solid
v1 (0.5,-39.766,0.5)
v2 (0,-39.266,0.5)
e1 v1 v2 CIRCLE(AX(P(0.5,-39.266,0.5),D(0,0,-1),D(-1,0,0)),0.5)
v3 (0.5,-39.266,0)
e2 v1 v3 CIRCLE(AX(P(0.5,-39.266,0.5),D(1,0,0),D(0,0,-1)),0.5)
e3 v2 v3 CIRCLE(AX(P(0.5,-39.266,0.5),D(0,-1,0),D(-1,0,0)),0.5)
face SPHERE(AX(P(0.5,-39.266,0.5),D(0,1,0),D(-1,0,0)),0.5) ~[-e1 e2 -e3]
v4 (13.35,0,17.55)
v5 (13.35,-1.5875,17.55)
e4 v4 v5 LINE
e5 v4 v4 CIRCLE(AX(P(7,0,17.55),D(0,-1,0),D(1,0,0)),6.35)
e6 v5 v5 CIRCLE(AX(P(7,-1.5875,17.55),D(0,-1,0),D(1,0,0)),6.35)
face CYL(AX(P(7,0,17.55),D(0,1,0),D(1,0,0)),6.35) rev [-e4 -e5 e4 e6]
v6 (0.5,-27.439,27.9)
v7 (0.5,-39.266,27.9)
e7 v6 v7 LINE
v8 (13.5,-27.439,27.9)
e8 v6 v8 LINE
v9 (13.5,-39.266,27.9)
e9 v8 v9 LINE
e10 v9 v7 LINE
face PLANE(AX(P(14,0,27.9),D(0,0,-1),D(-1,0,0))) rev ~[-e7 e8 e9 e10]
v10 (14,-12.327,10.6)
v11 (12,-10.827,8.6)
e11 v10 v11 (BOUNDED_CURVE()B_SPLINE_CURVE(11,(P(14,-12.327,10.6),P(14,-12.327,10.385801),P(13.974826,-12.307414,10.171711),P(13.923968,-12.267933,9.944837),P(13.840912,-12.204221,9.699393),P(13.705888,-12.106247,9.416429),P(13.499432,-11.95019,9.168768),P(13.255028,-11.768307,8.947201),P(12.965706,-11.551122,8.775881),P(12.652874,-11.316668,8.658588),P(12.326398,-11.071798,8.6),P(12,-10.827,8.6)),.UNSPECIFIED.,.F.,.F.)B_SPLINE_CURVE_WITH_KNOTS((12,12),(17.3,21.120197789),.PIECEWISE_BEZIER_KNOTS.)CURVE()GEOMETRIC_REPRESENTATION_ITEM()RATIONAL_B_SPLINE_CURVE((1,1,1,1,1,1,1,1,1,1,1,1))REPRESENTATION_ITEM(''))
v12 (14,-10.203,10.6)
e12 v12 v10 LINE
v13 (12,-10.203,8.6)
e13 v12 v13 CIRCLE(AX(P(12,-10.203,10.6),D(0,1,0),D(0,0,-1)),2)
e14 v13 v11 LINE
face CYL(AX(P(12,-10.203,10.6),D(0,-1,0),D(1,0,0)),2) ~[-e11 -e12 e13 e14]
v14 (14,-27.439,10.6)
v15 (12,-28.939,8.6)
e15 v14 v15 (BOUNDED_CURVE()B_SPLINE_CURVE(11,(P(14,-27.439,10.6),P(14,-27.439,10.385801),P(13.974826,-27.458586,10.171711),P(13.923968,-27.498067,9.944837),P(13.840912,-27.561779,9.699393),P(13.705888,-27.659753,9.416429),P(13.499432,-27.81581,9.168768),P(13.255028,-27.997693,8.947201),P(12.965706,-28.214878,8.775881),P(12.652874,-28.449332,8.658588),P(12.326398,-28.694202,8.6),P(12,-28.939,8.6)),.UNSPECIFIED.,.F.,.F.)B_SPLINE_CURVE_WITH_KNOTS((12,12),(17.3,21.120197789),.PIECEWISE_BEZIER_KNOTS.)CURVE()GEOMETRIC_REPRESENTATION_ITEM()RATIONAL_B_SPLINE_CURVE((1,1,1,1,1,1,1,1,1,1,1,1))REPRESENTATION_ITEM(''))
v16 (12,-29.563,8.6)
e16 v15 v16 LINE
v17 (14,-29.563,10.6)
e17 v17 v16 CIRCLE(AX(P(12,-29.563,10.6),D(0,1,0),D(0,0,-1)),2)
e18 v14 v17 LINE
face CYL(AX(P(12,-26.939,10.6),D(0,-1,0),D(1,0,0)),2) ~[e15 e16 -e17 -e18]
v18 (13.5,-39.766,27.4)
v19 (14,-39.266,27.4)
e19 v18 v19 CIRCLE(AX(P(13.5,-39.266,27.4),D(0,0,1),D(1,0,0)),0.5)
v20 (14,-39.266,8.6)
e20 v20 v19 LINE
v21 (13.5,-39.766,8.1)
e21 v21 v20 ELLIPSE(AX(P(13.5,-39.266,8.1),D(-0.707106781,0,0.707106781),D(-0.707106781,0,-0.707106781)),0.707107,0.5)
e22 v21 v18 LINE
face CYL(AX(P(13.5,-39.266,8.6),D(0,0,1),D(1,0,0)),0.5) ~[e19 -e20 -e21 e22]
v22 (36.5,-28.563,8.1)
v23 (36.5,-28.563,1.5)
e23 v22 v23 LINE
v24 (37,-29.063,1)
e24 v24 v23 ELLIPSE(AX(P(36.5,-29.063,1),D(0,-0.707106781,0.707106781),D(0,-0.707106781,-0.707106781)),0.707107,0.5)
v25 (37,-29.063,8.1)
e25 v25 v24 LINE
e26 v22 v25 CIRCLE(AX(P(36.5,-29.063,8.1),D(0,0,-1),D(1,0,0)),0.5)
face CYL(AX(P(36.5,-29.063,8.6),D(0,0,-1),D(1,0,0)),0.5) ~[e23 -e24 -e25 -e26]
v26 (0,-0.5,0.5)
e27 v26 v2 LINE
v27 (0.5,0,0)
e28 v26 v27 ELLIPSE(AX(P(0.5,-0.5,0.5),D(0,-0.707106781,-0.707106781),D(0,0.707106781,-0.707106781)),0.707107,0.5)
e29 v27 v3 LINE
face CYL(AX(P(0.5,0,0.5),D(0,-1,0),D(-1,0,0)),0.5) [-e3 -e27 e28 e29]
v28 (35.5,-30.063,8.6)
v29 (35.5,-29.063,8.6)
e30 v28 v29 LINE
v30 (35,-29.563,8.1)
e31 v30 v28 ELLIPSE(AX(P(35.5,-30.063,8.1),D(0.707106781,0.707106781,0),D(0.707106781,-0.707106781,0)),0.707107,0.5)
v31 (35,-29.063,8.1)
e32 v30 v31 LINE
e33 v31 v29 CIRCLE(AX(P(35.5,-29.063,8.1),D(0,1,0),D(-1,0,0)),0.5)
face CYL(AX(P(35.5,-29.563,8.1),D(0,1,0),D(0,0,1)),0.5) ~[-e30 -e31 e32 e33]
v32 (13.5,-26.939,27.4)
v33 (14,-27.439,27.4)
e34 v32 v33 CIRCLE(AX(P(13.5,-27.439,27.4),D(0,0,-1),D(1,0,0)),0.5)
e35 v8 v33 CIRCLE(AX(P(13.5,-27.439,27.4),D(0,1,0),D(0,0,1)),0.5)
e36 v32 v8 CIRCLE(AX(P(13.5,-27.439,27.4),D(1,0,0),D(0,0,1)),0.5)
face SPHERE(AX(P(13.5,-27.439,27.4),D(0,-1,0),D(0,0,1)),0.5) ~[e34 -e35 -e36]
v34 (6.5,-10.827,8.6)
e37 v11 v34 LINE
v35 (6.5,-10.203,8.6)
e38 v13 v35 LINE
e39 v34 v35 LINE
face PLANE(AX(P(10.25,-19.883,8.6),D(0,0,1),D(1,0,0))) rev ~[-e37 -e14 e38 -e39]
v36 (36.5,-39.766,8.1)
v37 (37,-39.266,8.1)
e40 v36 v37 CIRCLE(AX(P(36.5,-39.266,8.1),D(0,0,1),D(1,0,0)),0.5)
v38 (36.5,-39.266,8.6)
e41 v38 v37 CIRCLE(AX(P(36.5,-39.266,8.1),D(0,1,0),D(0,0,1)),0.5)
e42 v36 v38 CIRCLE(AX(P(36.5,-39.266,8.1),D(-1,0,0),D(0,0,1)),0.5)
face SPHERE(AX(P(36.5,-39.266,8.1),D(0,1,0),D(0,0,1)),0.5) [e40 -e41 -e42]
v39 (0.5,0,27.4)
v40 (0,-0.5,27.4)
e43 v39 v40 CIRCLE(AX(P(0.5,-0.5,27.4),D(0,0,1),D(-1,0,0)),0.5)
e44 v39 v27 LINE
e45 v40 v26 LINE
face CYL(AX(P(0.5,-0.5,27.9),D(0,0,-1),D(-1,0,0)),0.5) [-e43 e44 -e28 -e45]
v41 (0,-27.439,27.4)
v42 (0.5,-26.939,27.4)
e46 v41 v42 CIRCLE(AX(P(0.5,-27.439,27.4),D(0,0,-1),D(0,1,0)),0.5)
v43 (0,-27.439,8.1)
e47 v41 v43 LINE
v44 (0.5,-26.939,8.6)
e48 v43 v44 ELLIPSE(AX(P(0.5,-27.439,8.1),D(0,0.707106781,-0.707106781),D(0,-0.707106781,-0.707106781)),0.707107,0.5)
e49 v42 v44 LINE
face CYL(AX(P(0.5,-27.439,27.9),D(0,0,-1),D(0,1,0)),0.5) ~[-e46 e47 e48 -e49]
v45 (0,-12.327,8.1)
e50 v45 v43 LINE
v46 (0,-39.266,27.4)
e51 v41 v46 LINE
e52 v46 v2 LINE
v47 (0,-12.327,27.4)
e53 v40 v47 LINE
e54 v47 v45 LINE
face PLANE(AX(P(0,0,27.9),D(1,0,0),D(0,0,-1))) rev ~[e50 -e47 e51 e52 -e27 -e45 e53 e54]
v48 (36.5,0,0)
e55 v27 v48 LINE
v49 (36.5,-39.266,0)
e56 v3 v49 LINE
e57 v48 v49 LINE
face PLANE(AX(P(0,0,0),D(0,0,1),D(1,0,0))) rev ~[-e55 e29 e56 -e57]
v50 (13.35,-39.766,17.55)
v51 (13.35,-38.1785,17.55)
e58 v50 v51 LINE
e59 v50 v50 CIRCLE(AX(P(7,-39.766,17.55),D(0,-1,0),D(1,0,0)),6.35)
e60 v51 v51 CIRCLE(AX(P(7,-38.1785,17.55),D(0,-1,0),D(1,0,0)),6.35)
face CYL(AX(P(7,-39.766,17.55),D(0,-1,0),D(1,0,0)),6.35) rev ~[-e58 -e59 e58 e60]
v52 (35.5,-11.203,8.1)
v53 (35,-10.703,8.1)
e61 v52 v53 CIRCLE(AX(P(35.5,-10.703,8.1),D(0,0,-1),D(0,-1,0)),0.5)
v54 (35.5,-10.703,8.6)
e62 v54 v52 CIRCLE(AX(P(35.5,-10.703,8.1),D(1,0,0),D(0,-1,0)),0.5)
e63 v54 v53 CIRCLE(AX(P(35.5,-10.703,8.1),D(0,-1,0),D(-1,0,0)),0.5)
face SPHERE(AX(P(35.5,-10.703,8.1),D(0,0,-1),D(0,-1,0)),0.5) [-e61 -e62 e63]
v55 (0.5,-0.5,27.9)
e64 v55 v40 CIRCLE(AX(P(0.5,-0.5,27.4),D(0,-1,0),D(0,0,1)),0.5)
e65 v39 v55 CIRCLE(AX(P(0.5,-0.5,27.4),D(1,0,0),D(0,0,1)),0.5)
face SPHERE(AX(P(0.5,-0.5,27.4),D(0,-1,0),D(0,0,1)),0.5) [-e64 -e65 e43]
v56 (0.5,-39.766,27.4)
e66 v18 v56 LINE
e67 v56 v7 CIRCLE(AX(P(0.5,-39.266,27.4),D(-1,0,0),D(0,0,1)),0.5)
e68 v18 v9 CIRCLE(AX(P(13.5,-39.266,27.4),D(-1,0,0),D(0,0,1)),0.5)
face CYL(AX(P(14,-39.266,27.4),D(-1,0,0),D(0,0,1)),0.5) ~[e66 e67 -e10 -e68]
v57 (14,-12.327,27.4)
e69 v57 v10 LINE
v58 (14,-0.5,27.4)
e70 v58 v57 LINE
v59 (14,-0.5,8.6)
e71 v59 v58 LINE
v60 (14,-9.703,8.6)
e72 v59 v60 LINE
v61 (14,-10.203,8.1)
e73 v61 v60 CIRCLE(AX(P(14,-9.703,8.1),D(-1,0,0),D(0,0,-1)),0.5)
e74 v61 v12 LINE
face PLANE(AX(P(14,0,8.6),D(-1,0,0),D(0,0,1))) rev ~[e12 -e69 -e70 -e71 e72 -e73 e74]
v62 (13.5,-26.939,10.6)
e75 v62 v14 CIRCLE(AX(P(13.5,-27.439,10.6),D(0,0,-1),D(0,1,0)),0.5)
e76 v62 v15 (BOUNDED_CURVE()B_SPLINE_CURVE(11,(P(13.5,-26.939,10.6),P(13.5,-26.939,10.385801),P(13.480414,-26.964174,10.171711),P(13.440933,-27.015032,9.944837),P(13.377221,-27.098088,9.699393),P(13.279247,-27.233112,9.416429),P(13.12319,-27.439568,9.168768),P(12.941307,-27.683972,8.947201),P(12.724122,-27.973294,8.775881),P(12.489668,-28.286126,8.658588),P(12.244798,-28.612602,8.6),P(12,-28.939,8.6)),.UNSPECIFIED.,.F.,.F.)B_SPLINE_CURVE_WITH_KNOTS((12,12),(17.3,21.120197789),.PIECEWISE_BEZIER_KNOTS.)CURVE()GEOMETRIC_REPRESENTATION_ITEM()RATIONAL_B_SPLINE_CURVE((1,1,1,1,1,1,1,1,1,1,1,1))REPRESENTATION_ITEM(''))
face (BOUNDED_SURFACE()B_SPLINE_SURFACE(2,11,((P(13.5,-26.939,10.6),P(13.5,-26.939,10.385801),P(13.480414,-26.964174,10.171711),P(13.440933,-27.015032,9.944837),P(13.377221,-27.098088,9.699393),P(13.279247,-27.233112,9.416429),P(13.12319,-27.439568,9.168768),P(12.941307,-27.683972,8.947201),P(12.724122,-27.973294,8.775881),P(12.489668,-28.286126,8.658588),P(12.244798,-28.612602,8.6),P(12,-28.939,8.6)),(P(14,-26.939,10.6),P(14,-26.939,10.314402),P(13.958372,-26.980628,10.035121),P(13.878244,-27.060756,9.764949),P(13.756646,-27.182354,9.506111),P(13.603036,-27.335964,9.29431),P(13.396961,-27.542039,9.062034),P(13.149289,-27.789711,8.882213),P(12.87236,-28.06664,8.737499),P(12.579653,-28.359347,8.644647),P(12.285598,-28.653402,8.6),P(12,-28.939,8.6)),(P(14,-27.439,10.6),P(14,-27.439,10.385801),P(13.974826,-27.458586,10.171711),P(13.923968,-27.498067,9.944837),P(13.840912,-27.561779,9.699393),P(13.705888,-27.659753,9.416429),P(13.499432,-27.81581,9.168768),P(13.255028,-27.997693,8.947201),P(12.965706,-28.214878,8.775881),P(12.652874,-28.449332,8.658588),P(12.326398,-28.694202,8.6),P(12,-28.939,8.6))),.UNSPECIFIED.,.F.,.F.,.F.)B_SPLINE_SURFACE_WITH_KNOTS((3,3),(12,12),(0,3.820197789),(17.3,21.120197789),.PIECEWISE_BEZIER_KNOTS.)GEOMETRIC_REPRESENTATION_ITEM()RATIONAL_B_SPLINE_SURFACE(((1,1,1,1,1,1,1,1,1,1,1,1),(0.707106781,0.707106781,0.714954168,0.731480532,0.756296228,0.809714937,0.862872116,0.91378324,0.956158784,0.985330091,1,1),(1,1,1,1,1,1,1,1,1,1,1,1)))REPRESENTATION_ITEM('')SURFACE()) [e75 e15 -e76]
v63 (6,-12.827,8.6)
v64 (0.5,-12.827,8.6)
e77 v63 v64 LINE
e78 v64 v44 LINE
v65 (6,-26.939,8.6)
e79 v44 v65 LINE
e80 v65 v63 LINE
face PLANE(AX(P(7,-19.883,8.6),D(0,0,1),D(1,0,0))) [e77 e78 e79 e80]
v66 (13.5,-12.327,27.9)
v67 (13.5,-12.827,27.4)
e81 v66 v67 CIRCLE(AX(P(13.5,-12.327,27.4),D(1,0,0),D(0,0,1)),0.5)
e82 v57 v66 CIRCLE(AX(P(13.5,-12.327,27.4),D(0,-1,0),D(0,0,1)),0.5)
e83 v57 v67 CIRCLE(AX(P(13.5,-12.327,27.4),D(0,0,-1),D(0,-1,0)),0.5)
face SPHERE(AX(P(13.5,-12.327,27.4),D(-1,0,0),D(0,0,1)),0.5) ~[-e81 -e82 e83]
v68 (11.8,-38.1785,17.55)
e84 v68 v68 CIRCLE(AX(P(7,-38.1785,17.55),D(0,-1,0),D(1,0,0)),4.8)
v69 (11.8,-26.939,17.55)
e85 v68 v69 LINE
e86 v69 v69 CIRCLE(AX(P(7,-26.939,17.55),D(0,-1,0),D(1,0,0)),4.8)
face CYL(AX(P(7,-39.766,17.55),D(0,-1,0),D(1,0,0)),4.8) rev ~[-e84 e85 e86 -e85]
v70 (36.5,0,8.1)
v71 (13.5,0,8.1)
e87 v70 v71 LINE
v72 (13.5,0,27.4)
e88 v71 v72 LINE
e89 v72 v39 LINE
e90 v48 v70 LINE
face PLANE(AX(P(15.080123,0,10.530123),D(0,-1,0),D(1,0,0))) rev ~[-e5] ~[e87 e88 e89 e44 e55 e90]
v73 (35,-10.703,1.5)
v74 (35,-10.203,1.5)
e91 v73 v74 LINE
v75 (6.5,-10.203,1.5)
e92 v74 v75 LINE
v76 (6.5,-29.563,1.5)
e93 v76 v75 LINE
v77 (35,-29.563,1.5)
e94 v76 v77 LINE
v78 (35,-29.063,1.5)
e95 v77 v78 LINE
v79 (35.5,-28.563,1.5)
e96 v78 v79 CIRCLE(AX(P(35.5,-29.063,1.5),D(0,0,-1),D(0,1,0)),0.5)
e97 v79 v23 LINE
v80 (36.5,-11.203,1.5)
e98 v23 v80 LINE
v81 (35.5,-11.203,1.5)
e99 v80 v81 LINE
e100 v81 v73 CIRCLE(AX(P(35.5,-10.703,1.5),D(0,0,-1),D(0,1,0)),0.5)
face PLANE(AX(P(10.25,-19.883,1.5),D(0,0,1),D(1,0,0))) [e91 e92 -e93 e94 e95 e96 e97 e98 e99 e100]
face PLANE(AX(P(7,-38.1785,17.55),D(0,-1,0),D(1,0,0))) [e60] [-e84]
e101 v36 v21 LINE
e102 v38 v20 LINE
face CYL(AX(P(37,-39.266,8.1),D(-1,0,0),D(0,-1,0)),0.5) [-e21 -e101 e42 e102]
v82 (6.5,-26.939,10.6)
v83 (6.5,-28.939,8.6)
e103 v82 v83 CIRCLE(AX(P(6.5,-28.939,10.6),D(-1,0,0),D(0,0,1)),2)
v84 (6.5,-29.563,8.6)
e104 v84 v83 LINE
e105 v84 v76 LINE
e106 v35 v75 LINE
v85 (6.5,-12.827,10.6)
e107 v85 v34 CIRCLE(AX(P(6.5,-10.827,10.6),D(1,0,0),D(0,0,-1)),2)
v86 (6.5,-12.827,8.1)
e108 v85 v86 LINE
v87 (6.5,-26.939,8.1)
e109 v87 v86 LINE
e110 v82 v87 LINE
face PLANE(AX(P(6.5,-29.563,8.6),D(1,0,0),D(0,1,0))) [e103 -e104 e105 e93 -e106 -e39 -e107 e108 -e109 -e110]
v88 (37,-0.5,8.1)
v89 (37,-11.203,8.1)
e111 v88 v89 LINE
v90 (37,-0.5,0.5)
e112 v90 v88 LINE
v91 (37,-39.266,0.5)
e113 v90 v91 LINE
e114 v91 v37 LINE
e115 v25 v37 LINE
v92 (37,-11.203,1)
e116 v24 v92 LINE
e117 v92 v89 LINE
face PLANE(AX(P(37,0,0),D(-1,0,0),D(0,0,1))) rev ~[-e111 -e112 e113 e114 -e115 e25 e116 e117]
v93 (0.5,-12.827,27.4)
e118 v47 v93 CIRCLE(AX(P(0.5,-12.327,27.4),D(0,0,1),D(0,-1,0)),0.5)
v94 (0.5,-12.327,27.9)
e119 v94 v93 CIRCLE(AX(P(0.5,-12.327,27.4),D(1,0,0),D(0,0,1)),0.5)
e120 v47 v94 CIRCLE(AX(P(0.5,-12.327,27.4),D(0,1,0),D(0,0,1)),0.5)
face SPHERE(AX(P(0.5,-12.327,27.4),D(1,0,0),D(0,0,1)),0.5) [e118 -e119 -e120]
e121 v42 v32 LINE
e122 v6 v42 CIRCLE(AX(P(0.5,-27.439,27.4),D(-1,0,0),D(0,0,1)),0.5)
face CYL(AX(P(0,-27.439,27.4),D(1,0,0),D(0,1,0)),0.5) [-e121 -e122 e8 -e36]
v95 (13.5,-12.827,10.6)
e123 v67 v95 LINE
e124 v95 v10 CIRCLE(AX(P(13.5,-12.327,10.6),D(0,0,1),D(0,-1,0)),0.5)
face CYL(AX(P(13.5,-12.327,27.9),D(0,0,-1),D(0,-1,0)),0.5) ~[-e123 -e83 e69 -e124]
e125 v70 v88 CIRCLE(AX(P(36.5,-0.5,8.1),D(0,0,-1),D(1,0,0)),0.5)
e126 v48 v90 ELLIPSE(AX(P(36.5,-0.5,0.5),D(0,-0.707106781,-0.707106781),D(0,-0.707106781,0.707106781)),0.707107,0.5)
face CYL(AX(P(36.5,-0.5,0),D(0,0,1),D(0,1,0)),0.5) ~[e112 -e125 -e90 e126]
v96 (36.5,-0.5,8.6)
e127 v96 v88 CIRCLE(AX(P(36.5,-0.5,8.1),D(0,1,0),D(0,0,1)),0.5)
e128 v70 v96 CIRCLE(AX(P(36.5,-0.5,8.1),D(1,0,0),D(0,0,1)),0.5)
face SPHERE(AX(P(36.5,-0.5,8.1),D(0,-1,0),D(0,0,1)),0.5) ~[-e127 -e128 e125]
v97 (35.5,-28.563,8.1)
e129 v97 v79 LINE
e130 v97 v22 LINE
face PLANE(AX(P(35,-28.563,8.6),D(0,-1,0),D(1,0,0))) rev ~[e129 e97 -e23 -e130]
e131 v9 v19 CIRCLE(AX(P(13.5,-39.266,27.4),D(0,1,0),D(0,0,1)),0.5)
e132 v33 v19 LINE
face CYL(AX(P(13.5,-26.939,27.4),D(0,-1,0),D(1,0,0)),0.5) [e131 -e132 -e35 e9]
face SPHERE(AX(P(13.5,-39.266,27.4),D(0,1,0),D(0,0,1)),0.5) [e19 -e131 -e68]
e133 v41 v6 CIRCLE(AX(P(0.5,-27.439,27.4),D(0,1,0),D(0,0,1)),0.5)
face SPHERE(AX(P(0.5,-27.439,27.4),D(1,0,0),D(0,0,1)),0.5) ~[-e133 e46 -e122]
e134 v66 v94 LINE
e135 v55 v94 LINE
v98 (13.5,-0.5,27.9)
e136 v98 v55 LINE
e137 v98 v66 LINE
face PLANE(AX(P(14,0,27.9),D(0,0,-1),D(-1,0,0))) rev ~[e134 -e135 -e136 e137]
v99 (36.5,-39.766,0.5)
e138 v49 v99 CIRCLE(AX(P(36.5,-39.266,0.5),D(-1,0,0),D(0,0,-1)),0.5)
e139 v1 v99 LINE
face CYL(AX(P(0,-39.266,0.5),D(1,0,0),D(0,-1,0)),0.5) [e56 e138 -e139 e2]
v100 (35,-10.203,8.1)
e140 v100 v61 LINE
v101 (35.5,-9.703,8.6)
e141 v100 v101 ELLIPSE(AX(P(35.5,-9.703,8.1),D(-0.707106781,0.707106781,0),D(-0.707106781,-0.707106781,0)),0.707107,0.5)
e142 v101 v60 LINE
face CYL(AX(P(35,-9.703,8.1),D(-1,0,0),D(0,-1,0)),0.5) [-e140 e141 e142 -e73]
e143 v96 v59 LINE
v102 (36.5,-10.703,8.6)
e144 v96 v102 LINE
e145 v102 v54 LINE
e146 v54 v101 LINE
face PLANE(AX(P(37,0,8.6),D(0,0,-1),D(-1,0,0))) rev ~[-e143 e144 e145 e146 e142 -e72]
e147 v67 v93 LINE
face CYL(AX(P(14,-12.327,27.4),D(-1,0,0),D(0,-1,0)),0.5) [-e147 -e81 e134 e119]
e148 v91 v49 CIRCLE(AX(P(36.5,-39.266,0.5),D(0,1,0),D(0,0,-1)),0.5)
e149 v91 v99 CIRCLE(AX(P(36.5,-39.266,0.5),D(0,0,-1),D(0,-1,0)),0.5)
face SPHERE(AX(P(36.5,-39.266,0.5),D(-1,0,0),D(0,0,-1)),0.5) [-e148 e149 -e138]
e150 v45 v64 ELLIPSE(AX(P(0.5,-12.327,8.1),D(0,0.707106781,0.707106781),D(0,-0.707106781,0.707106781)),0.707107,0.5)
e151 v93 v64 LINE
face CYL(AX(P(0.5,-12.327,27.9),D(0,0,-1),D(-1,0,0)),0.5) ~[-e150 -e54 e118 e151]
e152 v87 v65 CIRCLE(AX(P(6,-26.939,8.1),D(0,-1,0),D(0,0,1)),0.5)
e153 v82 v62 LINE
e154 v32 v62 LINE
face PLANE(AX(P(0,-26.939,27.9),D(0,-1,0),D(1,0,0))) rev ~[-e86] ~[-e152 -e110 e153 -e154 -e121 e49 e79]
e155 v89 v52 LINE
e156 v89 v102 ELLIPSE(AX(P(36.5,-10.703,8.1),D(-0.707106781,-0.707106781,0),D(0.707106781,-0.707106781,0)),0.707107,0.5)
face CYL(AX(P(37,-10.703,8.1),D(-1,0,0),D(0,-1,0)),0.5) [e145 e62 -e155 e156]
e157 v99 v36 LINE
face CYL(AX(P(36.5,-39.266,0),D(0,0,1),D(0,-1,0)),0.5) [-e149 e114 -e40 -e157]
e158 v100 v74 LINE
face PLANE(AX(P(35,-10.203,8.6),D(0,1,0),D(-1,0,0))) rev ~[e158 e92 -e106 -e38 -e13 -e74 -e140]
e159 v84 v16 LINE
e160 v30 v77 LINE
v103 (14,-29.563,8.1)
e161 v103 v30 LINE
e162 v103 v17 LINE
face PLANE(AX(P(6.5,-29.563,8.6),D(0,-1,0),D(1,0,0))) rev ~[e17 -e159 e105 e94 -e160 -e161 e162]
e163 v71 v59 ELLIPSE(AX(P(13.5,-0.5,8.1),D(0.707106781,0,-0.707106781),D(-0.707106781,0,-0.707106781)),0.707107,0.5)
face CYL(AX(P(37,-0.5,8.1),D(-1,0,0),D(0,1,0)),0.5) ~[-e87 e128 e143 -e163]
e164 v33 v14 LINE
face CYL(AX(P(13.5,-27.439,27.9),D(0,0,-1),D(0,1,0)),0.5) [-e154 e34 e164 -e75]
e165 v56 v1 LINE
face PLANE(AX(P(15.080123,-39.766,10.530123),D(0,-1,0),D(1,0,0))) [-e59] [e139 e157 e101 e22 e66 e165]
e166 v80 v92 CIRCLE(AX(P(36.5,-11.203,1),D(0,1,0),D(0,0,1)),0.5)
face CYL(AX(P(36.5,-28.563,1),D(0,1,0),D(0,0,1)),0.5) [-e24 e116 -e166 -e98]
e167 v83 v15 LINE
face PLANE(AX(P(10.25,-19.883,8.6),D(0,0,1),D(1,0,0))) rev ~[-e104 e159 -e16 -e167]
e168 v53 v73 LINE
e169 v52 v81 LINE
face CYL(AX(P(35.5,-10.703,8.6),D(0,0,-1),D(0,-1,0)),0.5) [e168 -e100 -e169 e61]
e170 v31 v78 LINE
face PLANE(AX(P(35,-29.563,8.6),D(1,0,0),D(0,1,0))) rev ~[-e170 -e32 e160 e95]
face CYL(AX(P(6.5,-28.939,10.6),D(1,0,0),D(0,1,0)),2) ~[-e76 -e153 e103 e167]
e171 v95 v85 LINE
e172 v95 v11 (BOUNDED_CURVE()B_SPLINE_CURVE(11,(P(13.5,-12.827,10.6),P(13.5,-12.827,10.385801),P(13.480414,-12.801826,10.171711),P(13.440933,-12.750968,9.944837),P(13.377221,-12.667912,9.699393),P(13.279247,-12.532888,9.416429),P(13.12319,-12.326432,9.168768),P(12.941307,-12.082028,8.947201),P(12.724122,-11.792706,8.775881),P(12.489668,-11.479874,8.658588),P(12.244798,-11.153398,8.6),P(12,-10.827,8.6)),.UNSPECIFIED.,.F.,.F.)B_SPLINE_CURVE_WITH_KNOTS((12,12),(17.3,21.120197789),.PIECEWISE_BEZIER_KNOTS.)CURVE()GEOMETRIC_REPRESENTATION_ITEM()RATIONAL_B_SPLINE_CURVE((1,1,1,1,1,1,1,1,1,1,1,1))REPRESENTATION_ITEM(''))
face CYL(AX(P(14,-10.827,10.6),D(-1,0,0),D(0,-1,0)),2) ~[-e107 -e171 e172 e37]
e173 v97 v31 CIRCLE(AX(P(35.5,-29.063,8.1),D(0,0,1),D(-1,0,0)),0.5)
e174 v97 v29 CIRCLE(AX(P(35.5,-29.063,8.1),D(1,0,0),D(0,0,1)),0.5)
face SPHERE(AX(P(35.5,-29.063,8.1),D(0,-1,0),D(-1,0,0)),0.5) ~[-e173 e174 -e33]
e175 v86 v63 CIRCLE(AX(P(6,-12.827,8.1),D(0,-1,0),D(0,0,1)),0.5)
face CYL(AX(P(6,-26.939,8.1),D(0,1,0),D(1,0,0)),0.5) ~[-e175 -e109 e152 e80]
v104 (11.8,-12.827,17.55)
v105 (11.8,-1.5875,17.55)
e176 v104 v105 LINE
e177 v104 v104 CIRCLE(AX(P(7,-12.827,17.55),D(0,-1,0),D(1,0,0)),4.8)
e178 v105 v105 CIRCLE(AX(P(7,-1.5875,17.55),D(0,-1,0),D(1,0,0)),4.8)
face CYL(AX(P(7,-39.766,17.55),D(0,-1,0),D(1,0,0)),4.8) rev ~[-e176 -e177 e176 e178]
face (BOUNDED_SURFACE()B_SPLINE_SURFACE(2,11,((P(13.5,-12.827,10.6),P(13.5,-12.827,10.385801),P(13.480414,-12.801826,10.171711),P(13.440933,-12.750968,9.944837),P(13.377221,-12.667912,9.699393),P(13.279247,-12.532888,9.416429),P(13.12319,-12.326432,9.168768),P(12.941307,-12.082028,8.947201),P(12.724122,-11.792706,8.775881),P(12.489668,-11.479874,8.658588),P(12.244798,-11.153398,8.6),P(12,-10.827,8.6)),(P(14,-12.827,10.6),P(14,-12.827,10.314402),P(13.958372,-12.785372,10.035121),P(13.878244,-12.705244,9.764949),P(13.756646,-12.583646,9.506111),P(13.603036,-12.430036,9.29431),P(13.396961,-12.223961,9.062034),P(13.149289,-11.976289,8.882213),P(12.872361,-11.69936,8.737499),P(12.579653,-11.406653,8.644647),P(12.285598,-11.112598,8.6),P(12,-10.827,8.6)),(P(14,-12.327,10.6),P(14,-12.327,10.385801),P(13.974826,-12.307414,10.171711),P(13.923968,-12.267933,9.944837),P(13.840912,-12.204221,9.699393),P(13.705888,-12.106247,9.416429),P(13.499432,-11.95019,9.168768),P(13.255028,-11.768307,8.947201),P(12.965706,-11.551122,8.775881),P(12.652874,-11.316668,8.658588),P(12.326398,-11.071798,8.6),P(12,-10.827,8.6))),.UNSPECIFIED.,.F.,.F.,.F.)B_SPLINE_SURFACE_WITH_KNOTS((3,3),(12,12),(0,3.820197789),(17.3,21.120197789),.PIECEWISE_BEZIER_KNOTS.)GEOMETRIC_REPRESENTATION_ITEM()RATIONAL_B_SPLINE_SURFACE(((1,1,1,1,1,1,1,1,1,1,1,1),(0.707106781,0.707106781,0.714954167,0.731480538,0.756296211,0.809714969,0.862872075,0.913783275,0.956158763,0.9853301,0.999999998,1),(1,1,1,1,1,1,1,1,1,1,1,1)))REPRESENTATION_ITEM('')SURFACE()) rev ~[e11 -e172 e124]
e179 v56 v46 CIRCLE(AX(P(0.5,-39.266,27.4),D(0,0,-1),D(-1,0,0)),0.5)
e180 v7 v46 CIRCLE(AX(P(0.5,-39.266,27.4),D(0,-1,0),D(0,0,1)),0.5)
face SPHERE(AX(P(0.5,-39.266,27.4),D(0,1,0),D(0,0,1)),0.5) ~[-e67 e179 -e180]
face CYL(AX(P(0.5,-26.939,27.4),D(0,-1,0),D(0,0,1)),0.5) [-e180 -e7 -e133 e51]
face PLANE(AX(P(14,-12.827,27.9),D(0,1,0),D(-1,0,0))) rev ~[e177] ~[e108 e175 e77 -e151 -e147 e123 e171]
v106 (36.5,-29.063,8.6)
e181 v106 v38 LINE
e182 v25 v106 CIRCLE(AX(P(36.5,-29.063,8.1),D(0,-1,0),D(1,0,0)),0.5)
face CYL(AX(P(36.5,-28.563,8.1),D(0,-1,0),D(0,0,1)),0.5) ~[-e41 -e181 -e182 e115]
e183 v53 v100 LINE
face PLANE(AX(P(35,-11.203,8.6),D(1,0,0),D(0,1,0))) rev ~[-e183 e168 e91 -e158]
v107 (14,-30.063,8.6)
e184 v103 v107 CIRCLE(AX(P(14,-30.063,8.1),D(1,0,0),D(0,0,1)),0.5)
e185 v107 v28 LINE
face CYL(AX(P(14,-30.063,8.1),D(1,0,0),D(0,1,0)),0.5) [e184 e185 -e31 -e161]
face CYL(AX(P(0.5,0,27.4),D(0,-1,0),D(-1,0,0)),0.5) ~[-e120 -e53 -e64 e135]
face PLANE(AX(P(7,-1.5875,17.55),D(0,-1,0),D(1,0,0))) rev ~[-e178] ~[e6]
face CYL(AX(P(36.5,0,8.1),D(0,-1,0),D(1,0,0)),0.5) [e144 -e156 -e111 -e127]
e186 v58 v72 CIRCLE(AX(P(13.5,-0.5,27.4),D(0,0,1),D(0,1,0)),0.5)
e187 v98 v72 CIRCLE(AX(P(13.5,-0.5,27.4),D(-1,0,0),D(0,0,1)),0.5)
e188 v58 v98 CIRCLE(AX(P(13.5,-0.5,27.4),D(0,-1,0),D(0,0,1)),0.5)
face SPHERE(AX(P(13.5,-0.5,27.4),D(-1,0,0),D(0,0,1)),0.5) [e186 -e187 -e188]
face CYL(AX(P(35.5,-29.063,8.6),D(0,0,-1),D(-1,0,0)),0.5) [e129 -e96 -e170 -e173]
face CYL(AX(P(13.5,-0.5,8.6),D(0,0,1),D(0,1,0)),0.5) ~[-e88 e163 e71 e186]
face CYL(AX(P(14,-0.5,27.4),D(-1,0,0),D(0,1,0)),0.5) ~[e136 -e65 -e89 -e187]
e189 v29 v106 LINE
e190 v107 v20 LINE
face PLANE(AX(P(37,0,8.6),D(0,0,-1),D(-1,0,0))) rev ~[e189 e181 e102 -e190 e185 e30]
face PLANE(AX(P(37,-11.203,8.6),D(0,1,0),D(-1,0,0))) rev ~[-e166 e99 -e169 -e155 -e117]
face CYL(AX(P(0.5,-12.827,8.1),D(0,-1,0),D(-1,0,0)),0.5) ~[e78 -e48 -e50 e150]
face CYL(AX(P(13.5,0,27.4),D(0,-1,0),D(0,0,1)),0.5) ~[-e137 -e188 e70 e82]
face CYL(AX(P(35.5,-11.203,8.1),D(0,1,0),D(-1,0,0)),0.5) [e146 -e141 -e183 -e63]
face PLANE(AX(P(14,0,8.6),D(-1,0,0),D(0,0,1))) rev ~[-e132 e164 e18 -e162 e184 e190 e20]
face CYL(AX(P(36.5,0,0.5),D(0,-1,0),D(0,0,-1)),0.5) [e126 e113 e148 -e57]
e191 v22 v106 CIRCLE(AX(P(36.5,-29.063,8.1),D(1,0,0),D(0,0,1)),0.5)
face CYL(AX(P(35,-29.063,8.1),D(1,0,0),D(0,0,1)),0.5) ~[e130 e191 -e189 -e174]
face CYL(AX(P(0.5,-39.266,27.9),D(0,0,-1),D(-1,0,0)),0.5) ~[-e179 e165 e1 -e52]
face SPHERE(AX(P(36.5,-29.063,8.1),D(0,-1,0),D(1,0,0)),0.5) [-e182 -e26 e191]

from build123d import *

# Parameters (mm, degrees)
F1_DEPTH  = 39.766
F2_R      = 4.8
F3_DEPTH  = 39.767
F2_R_2    = 6.35
F4_DEPTH  = 1.5875
F5_R      = 6.35
F6_DEPTH  = 1.5875
F7_W      = 7.5
F7_H      = 19.36
F8_DEPTH  = 7.1
F10_DEPTH = 19.3
F11_R     = 2
F12_R     = 0.5


with BuildPart() as f1:
    # F0 (on Front) → F1 (new body)
    with BuildSketch(Plane.XZ):
        Polygon((0, 27.9), (0, 0), (37, 0), (37, 8.6), (14, 8.6), (14, 27.9), align=None)
    extrude(amount=F1_DEPTH)

    # F2 (on face) → F3 (cut, through all)
    with BuildSketch(Plane.XZ.offset(39.766)):
        with Locations((7, 17.55)):
            Circle(F2_R)
    extrude(amount=-F3_DEPTH, mode=Mode.SUBTRACT)

    # F2 (on face) → F4 (cut)
    with BuildSketch(Plane.XZ.offset(39.766)):
        with Locations((7, 17.55)):
            Circle(F2_R_2)
        with Locations((7, 17.55)):
            Circle(F2_R, mode=Mode.SUBTRACT)
    extrude(amount=-F4_DEPTH, mode=Mode.SUBTRACT)

    # F5 (on face) → F6 (cut)
    with BuildSketch(Plane.XZ):
        with Locations((7, 17.55)):
            Circle(F5_R)
    extrude(amount=F6_DEPTH, mode=Mode.SUBTRACT)

    # F7 (on face) → F8 (cut)
    with BuildSketch(Plane.XY.offset(8.6)):
        with Locations((10.25, -19.883)):
            Rectangle(F7_W, F7_H)
        Polygon((37, -28.563), (37, -11.203), (35, -11.203), (35, -10.203), (14, -10.203), (14, -29.563), (35, -29.563), (35, -28.563), align=None)
    extrude(amount=-F8_DEPTH, mode=Mode.SUBTRACT)

    # F9 (on face) → F10 (cut, through all)
    with BuildSketch(Plane.XY.offset(27.9)):
        Polygon((0, -12.827), (0, -19.883), (0, -26.939), (14, -26.939), (14, -12.827), align=None)
    extrude(amount=-F10_DEPTH, mode=Mode.SUBTRACT)

    # F11
    f11_edges = [f1.edges().sort_by_distance(p)[0] for p in [
        (10.25, -26.939, 8.6),
        (14, -11.515, 8.6),
        (10.25, -12.827, 8.6),
        (14, -28.251, 8.6),
    ]]
    fillet(f11_edges, radius=F11_R)

    # F12
    f12_edges = [f1.edges().sort_by_distance(p)[0] for p in [
        (24.5, -10.203, 8.6),
        (24.5, -29.563, 8.6),
        (6.5, -19.883, 8.6),
        (37, -5.6015, 8.6),
        (37, -34.1645, 8.6),
        (37, -28.563, 5.05),
        (35, -11.203, 5.05),
        (37, -19.883, 1.5),
        (35, -29.063, 8.6),
        (35, -28.563, 5.05),
        (36, -28.563, 8.6),
        (36, -11.203, 8.6),
        (35, -10.703, 8.6),
        (25.5, 0, 8.6),
        (25.5, -39.766, 8.6),
        (14, -33.3525, 27.9),
        (7, -26.939, 27.9),
        (0, -33.3525, 27.9),
        (7, -39.766, 27.9),
        (7, -12.827, 27.9),
        (0, -19.883, 8.6),
        (0, -6.4135, 27.9),
        (7, 0, 27.9),
        (14, -6.4135, 27.9),
        (14, -12.827, 19.25),
        (0, -12.827, 18.25),
        (0, 0, 13.95),
        (0, -19.883, 0),
        (0, -39.766, 13.95),
        (14, -39.766, 18.25),
        (14, -26.939, 19.25),
        (14, 0, 18.25),
        (18.5, -39.766, 0),
        (37, -19.883, 0),
        (37, -39.766, 4.3),
        (37, 0, 4.3),
        (0, -26.939, 18.25),
        (13.414214, -12.241214, 9.185786),
        (13.414214, -27.524786, 9.185786),
    ]]
    fillet(f12_edges, radius=F12_R)


solid = f1.part
